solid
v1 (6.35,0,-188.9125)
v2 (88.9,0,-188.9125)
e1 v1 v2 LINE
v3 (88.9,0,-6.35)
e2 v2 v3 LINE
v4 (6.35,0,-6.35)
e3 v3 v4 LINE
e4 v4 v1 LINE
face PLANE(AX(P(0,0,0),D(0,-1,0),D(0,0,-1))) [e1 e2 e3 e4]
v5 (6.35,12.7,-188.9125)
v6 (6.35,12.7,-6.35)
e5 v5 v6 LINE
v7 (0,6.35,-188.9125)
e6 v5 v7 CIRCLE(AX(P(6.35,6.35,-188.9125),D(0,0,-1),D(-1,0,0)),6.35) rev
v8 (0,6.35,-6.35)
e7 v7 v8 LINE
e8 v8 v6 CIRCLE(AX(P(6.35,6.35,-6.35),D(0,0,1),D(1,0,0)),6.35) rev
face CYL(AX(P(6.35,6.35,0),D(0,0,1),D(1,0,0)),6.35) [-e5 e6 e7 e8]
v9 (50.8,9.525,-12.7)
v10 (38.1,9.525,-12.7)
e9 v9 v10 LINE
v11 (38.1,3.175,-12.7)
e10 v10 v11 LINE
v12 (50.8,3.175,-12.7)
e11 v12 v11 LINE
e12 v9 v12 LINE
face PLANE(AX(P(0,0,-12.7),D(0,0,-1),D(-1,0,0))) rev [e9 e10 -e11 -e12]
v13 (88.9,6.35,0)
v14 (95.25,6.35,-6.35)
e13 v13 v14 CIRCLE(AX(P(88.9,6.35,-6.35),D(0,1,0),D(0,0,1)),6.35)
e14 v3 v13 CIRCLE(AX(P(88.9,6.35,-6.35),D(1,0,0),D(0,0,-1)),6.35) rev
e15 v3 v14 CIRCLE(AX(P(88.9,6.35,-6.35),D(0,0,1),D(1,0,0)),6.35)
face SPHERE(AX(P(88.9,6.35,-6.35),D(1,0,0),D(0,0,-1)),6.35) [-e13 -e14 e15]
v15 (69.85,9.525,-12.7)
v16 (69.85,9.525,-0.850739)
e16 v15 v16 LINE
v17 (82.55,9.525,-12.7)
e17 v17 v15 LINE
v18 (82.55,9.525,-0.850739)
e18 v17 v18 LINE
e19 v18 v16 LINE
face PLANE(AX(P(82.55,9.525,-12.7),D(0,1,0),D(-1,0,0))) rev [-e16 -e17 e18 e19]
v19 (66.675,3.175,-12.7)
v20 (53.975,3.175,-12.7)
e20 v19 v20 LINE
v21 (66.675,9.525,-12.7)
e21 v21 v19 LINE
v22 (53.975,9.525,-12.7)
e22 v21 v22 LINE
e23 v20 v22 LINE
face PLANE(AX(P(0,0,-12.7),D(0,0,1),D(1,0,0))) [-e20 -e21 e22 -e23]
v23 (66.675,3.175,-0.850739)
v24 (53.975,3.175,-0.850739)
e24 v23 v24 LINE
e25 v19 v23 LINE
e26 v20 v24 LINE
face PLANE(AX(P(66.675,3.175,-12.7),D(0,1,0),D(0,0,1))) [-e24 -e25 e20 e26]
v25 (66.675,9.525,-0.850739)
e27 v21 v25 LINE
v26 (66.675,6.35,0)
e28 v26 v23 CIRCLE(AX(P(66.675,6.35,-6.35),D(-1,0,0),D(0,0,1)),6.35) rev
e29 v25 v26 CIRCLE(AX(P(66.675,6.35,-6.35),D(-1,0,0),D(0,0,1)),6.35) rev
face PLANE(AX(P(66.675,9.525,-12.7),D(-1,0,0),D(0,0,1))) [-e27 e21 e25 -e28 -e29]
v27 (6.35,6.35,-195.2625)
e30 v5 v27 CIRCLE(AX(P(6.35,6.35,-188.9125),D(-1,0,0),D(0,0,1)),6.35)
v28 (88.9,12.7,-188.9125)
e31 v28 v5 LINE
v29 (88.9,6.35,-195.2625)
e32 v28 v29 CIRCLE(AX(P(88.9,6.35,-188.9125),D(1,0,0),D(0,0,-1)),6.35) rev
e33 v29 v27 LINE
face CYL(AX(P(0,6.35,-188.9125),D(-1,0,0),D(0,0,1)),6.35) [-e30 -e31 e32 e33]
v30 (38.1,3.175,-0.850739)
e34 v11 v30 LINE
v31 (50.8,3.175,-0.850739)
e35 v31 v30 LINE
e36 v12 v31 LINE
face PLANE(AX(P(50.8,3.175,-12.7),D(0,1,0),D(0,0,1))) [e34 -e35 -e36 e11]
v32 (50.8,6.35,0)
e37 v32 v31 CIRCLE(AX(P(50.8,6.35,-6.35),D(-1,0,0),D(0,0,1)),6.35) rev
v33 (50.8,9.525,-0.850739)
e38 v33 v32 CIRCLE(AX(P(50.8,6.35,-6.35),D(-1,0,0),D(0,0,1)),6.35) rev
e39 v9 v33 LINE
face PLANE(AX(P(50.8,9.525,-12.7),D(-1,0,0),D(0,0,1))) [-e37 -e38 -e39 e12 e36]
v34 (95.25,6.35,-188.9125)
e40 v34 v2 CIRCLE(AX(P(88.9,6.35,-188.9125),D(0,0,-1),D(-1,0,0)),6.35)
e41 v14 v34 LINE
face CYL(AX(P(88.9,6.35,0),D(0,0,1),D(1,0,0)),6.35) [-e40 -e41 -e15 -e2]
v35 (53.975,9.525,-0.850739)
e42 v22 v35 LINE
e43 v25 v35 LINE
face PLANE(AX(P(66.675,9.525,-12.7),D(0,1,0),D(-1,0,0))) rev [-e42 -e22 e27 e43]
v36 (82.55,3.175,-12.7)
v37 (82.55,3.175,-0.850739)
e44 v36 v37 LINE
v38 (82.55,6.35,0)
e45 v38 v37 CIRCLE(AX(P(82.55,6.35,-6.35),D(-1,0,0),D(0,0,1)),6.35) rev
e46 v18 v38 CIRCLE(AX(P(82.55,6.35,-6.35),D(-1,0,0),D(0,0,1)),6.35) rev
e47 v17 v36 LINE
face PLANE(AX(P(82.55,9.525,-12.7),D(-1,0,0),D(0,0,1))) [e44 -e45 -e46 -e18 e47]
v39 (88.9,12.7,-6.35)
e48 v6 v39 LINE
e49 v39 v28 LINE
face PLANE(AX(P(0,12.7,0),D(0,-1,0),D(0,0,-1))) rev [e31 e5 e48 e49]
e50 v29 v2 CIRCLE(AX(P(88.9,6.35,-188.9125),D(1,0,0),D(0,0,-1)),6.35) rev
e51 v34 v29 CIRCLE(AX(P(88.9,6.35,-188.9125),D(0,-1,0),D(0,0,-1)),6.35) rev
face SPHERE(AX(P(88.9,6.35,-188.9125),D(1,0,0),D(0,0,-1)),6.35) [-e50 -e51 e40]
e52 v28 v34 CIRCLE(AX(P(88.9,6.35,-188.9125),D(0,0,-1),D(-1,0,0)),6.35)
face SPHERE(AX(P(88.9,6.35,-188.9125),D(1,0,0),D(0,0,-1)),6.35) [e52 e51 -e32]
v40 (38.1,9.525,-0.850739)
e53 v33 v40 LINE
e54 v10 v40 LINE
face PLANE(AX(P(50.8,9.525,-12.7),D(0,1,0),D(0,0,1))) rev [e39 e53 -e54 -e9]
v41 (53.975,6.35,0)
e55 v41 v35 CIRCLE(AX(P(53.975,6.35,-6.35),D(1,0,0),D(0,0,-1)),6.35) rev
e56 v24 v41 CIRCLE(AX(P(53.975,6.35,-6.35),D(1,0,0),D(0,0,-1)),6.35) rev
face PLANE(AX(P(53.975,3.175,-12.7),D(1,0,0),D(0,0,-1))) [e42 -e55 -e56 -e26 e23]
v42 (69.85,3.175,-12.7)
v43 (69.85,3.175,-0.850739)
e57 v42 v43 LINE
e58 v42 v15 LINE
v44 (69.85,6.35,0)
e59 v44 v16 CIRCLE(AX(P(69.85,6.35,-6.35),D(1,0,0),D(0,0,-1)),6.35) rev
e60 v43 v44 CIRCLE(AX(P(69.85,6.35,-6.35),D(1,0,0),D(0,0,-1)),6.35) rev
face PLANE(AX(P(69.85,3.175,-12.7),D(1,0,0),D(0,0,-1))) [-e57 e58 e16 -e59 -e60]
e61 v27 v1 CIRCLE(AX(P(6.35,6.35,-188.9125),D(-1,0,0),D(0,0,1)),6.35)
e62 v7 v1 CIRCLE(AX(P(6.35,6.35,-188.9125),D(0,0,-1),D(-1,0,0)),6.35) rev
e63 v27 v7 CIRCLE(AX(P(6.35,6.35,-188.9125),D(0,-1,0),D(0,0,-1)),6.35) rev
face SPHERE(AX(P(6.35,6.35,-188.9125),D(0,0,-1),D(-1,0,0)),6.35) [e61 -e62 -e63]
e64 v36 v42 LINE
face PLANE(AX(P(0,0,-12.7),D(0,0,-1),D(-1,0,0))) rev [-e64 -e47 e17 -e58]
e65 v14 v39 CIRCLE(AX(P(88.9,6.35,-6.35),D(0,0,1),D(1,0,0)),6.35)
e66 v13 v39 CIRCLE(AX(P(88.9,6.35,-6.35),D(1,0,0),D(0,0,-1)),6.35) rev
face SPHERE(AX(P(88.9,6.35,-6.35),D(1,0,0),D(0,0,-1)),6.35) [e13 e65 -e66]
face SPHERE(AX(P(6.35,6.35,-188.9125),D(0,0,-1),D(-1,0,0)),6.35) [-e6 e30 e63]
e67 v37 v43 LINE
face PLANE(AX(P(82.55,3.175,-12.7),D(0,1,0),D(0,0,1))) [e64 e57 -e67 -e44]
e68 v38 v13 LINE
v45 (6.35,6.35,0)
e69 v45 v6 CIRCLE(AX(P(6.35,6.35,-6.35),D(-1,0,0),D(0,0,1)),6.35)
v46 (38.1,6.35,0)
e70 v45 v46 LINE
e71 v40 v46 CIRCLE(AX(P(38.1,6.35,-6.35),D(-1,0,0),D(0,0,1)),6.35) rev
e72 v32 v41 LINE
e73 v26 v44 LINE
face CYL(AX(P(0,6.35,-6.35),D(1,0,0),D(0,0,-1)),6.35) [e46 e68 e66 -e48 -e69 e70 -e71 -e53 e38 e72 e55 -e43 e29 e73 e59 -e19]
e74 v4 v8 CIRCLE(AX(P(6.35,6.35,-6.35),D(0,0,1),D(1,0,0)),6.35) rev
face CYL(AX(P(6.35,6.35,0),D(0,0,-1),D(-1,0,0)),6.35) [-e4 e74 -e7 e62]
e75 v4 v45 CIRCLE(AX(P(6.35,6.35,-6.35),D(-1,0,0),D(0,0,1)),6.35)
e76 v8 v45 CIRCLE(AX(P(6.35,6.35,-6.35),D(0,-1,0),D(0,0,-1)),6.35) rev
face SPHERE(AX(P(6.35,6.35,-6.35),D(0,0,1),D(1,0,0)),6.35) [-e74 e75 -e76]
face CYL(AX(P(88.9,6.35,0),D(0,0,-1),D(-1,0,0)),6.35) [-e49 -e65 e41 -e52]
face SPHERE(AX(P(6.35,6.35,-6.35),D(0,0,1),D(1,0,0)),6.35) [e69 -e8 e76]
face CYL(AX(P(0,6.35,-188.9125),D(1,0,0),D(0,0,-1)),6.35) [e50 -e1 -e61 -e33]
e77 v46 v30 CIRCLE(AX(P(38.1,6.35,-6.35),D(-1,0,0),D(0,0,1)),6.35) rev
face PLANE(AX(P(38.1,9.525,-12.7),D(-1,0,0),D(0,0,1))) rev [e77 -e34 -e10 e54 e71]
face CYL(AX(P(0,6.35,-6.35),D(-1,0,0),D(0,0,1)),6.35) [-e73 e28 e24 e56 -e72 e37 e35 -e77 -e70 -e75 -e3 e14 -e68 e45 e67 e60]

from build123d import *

# Parameters (mm, degrees)
SKETCH1_W           = 95.25
SKETCH1_H           = 195.2625
BOSS_EXTRUDE1_DEPTH = 12.7
FILLET1_R           = 6.35
SKETCH2_W           = 12.7
SKETCH2_H           = 6.35
CUT_EXTRUDE1_DEPTH  = 12.7


with BuildPart() as part:
    # Sketch1 → Boss-Extrude1 (new body)
    with BuildSketch(Plane(origin=(0, 0, 0), x_dir=(1, 0, 0), z_dir=(0, 1, 0))):
        with Locations((47.625, 97.63125)):
            Rectangle(SKETCH1_W, SKETCH1_H)
    extrude(amount=BOSS_EXTRUDE1_DEPTH)

    # Fillet1
    fillet1_edges = [part.edges().sort_by_distance(p)[0] for p in [
        (95.25, 12.7, -97.63125),
        (47.625, 12.7, -195.2625),
        (0, 12.7, -97.63125),
        (47.625, 0, -195.2625),
        (95.25, 0, -97.63125),
        (47.625, 0, 0),
        (0, 0, -97.63125),
        (0, 6.35, -195.2625),
        (95.25, 6.35, -195.2625),
        (95.25, 6.35, 0),
        (0, 6.35, 0),
        (47.625, 12.7, 0),
    ]]
    fillet(fillet1_edges, radius=FILLET1_R - 0.0001)  # a hair under: the kernel refuses the full size

    # Sketch2 → Cut-Extrude1 (cut)
    with BuildSketch(Plane.XY):
        with Locations((76.2, 6.35)):
            Rectangle(SKETCH2_W, SKETCH2_H)
        with Locations((60.325, 6.35)):
            Rectangle(SKETCH2_W, SKETCH2_H)
        with Locations((44.45, 6.35)):
            Rectangle(SKETCH2_W, SKETCH2_H)
    extrude(amount=-CUT_EXTRUDE1_DEPTH, mode=Mode.SUBTRACT)


solid = part.part
